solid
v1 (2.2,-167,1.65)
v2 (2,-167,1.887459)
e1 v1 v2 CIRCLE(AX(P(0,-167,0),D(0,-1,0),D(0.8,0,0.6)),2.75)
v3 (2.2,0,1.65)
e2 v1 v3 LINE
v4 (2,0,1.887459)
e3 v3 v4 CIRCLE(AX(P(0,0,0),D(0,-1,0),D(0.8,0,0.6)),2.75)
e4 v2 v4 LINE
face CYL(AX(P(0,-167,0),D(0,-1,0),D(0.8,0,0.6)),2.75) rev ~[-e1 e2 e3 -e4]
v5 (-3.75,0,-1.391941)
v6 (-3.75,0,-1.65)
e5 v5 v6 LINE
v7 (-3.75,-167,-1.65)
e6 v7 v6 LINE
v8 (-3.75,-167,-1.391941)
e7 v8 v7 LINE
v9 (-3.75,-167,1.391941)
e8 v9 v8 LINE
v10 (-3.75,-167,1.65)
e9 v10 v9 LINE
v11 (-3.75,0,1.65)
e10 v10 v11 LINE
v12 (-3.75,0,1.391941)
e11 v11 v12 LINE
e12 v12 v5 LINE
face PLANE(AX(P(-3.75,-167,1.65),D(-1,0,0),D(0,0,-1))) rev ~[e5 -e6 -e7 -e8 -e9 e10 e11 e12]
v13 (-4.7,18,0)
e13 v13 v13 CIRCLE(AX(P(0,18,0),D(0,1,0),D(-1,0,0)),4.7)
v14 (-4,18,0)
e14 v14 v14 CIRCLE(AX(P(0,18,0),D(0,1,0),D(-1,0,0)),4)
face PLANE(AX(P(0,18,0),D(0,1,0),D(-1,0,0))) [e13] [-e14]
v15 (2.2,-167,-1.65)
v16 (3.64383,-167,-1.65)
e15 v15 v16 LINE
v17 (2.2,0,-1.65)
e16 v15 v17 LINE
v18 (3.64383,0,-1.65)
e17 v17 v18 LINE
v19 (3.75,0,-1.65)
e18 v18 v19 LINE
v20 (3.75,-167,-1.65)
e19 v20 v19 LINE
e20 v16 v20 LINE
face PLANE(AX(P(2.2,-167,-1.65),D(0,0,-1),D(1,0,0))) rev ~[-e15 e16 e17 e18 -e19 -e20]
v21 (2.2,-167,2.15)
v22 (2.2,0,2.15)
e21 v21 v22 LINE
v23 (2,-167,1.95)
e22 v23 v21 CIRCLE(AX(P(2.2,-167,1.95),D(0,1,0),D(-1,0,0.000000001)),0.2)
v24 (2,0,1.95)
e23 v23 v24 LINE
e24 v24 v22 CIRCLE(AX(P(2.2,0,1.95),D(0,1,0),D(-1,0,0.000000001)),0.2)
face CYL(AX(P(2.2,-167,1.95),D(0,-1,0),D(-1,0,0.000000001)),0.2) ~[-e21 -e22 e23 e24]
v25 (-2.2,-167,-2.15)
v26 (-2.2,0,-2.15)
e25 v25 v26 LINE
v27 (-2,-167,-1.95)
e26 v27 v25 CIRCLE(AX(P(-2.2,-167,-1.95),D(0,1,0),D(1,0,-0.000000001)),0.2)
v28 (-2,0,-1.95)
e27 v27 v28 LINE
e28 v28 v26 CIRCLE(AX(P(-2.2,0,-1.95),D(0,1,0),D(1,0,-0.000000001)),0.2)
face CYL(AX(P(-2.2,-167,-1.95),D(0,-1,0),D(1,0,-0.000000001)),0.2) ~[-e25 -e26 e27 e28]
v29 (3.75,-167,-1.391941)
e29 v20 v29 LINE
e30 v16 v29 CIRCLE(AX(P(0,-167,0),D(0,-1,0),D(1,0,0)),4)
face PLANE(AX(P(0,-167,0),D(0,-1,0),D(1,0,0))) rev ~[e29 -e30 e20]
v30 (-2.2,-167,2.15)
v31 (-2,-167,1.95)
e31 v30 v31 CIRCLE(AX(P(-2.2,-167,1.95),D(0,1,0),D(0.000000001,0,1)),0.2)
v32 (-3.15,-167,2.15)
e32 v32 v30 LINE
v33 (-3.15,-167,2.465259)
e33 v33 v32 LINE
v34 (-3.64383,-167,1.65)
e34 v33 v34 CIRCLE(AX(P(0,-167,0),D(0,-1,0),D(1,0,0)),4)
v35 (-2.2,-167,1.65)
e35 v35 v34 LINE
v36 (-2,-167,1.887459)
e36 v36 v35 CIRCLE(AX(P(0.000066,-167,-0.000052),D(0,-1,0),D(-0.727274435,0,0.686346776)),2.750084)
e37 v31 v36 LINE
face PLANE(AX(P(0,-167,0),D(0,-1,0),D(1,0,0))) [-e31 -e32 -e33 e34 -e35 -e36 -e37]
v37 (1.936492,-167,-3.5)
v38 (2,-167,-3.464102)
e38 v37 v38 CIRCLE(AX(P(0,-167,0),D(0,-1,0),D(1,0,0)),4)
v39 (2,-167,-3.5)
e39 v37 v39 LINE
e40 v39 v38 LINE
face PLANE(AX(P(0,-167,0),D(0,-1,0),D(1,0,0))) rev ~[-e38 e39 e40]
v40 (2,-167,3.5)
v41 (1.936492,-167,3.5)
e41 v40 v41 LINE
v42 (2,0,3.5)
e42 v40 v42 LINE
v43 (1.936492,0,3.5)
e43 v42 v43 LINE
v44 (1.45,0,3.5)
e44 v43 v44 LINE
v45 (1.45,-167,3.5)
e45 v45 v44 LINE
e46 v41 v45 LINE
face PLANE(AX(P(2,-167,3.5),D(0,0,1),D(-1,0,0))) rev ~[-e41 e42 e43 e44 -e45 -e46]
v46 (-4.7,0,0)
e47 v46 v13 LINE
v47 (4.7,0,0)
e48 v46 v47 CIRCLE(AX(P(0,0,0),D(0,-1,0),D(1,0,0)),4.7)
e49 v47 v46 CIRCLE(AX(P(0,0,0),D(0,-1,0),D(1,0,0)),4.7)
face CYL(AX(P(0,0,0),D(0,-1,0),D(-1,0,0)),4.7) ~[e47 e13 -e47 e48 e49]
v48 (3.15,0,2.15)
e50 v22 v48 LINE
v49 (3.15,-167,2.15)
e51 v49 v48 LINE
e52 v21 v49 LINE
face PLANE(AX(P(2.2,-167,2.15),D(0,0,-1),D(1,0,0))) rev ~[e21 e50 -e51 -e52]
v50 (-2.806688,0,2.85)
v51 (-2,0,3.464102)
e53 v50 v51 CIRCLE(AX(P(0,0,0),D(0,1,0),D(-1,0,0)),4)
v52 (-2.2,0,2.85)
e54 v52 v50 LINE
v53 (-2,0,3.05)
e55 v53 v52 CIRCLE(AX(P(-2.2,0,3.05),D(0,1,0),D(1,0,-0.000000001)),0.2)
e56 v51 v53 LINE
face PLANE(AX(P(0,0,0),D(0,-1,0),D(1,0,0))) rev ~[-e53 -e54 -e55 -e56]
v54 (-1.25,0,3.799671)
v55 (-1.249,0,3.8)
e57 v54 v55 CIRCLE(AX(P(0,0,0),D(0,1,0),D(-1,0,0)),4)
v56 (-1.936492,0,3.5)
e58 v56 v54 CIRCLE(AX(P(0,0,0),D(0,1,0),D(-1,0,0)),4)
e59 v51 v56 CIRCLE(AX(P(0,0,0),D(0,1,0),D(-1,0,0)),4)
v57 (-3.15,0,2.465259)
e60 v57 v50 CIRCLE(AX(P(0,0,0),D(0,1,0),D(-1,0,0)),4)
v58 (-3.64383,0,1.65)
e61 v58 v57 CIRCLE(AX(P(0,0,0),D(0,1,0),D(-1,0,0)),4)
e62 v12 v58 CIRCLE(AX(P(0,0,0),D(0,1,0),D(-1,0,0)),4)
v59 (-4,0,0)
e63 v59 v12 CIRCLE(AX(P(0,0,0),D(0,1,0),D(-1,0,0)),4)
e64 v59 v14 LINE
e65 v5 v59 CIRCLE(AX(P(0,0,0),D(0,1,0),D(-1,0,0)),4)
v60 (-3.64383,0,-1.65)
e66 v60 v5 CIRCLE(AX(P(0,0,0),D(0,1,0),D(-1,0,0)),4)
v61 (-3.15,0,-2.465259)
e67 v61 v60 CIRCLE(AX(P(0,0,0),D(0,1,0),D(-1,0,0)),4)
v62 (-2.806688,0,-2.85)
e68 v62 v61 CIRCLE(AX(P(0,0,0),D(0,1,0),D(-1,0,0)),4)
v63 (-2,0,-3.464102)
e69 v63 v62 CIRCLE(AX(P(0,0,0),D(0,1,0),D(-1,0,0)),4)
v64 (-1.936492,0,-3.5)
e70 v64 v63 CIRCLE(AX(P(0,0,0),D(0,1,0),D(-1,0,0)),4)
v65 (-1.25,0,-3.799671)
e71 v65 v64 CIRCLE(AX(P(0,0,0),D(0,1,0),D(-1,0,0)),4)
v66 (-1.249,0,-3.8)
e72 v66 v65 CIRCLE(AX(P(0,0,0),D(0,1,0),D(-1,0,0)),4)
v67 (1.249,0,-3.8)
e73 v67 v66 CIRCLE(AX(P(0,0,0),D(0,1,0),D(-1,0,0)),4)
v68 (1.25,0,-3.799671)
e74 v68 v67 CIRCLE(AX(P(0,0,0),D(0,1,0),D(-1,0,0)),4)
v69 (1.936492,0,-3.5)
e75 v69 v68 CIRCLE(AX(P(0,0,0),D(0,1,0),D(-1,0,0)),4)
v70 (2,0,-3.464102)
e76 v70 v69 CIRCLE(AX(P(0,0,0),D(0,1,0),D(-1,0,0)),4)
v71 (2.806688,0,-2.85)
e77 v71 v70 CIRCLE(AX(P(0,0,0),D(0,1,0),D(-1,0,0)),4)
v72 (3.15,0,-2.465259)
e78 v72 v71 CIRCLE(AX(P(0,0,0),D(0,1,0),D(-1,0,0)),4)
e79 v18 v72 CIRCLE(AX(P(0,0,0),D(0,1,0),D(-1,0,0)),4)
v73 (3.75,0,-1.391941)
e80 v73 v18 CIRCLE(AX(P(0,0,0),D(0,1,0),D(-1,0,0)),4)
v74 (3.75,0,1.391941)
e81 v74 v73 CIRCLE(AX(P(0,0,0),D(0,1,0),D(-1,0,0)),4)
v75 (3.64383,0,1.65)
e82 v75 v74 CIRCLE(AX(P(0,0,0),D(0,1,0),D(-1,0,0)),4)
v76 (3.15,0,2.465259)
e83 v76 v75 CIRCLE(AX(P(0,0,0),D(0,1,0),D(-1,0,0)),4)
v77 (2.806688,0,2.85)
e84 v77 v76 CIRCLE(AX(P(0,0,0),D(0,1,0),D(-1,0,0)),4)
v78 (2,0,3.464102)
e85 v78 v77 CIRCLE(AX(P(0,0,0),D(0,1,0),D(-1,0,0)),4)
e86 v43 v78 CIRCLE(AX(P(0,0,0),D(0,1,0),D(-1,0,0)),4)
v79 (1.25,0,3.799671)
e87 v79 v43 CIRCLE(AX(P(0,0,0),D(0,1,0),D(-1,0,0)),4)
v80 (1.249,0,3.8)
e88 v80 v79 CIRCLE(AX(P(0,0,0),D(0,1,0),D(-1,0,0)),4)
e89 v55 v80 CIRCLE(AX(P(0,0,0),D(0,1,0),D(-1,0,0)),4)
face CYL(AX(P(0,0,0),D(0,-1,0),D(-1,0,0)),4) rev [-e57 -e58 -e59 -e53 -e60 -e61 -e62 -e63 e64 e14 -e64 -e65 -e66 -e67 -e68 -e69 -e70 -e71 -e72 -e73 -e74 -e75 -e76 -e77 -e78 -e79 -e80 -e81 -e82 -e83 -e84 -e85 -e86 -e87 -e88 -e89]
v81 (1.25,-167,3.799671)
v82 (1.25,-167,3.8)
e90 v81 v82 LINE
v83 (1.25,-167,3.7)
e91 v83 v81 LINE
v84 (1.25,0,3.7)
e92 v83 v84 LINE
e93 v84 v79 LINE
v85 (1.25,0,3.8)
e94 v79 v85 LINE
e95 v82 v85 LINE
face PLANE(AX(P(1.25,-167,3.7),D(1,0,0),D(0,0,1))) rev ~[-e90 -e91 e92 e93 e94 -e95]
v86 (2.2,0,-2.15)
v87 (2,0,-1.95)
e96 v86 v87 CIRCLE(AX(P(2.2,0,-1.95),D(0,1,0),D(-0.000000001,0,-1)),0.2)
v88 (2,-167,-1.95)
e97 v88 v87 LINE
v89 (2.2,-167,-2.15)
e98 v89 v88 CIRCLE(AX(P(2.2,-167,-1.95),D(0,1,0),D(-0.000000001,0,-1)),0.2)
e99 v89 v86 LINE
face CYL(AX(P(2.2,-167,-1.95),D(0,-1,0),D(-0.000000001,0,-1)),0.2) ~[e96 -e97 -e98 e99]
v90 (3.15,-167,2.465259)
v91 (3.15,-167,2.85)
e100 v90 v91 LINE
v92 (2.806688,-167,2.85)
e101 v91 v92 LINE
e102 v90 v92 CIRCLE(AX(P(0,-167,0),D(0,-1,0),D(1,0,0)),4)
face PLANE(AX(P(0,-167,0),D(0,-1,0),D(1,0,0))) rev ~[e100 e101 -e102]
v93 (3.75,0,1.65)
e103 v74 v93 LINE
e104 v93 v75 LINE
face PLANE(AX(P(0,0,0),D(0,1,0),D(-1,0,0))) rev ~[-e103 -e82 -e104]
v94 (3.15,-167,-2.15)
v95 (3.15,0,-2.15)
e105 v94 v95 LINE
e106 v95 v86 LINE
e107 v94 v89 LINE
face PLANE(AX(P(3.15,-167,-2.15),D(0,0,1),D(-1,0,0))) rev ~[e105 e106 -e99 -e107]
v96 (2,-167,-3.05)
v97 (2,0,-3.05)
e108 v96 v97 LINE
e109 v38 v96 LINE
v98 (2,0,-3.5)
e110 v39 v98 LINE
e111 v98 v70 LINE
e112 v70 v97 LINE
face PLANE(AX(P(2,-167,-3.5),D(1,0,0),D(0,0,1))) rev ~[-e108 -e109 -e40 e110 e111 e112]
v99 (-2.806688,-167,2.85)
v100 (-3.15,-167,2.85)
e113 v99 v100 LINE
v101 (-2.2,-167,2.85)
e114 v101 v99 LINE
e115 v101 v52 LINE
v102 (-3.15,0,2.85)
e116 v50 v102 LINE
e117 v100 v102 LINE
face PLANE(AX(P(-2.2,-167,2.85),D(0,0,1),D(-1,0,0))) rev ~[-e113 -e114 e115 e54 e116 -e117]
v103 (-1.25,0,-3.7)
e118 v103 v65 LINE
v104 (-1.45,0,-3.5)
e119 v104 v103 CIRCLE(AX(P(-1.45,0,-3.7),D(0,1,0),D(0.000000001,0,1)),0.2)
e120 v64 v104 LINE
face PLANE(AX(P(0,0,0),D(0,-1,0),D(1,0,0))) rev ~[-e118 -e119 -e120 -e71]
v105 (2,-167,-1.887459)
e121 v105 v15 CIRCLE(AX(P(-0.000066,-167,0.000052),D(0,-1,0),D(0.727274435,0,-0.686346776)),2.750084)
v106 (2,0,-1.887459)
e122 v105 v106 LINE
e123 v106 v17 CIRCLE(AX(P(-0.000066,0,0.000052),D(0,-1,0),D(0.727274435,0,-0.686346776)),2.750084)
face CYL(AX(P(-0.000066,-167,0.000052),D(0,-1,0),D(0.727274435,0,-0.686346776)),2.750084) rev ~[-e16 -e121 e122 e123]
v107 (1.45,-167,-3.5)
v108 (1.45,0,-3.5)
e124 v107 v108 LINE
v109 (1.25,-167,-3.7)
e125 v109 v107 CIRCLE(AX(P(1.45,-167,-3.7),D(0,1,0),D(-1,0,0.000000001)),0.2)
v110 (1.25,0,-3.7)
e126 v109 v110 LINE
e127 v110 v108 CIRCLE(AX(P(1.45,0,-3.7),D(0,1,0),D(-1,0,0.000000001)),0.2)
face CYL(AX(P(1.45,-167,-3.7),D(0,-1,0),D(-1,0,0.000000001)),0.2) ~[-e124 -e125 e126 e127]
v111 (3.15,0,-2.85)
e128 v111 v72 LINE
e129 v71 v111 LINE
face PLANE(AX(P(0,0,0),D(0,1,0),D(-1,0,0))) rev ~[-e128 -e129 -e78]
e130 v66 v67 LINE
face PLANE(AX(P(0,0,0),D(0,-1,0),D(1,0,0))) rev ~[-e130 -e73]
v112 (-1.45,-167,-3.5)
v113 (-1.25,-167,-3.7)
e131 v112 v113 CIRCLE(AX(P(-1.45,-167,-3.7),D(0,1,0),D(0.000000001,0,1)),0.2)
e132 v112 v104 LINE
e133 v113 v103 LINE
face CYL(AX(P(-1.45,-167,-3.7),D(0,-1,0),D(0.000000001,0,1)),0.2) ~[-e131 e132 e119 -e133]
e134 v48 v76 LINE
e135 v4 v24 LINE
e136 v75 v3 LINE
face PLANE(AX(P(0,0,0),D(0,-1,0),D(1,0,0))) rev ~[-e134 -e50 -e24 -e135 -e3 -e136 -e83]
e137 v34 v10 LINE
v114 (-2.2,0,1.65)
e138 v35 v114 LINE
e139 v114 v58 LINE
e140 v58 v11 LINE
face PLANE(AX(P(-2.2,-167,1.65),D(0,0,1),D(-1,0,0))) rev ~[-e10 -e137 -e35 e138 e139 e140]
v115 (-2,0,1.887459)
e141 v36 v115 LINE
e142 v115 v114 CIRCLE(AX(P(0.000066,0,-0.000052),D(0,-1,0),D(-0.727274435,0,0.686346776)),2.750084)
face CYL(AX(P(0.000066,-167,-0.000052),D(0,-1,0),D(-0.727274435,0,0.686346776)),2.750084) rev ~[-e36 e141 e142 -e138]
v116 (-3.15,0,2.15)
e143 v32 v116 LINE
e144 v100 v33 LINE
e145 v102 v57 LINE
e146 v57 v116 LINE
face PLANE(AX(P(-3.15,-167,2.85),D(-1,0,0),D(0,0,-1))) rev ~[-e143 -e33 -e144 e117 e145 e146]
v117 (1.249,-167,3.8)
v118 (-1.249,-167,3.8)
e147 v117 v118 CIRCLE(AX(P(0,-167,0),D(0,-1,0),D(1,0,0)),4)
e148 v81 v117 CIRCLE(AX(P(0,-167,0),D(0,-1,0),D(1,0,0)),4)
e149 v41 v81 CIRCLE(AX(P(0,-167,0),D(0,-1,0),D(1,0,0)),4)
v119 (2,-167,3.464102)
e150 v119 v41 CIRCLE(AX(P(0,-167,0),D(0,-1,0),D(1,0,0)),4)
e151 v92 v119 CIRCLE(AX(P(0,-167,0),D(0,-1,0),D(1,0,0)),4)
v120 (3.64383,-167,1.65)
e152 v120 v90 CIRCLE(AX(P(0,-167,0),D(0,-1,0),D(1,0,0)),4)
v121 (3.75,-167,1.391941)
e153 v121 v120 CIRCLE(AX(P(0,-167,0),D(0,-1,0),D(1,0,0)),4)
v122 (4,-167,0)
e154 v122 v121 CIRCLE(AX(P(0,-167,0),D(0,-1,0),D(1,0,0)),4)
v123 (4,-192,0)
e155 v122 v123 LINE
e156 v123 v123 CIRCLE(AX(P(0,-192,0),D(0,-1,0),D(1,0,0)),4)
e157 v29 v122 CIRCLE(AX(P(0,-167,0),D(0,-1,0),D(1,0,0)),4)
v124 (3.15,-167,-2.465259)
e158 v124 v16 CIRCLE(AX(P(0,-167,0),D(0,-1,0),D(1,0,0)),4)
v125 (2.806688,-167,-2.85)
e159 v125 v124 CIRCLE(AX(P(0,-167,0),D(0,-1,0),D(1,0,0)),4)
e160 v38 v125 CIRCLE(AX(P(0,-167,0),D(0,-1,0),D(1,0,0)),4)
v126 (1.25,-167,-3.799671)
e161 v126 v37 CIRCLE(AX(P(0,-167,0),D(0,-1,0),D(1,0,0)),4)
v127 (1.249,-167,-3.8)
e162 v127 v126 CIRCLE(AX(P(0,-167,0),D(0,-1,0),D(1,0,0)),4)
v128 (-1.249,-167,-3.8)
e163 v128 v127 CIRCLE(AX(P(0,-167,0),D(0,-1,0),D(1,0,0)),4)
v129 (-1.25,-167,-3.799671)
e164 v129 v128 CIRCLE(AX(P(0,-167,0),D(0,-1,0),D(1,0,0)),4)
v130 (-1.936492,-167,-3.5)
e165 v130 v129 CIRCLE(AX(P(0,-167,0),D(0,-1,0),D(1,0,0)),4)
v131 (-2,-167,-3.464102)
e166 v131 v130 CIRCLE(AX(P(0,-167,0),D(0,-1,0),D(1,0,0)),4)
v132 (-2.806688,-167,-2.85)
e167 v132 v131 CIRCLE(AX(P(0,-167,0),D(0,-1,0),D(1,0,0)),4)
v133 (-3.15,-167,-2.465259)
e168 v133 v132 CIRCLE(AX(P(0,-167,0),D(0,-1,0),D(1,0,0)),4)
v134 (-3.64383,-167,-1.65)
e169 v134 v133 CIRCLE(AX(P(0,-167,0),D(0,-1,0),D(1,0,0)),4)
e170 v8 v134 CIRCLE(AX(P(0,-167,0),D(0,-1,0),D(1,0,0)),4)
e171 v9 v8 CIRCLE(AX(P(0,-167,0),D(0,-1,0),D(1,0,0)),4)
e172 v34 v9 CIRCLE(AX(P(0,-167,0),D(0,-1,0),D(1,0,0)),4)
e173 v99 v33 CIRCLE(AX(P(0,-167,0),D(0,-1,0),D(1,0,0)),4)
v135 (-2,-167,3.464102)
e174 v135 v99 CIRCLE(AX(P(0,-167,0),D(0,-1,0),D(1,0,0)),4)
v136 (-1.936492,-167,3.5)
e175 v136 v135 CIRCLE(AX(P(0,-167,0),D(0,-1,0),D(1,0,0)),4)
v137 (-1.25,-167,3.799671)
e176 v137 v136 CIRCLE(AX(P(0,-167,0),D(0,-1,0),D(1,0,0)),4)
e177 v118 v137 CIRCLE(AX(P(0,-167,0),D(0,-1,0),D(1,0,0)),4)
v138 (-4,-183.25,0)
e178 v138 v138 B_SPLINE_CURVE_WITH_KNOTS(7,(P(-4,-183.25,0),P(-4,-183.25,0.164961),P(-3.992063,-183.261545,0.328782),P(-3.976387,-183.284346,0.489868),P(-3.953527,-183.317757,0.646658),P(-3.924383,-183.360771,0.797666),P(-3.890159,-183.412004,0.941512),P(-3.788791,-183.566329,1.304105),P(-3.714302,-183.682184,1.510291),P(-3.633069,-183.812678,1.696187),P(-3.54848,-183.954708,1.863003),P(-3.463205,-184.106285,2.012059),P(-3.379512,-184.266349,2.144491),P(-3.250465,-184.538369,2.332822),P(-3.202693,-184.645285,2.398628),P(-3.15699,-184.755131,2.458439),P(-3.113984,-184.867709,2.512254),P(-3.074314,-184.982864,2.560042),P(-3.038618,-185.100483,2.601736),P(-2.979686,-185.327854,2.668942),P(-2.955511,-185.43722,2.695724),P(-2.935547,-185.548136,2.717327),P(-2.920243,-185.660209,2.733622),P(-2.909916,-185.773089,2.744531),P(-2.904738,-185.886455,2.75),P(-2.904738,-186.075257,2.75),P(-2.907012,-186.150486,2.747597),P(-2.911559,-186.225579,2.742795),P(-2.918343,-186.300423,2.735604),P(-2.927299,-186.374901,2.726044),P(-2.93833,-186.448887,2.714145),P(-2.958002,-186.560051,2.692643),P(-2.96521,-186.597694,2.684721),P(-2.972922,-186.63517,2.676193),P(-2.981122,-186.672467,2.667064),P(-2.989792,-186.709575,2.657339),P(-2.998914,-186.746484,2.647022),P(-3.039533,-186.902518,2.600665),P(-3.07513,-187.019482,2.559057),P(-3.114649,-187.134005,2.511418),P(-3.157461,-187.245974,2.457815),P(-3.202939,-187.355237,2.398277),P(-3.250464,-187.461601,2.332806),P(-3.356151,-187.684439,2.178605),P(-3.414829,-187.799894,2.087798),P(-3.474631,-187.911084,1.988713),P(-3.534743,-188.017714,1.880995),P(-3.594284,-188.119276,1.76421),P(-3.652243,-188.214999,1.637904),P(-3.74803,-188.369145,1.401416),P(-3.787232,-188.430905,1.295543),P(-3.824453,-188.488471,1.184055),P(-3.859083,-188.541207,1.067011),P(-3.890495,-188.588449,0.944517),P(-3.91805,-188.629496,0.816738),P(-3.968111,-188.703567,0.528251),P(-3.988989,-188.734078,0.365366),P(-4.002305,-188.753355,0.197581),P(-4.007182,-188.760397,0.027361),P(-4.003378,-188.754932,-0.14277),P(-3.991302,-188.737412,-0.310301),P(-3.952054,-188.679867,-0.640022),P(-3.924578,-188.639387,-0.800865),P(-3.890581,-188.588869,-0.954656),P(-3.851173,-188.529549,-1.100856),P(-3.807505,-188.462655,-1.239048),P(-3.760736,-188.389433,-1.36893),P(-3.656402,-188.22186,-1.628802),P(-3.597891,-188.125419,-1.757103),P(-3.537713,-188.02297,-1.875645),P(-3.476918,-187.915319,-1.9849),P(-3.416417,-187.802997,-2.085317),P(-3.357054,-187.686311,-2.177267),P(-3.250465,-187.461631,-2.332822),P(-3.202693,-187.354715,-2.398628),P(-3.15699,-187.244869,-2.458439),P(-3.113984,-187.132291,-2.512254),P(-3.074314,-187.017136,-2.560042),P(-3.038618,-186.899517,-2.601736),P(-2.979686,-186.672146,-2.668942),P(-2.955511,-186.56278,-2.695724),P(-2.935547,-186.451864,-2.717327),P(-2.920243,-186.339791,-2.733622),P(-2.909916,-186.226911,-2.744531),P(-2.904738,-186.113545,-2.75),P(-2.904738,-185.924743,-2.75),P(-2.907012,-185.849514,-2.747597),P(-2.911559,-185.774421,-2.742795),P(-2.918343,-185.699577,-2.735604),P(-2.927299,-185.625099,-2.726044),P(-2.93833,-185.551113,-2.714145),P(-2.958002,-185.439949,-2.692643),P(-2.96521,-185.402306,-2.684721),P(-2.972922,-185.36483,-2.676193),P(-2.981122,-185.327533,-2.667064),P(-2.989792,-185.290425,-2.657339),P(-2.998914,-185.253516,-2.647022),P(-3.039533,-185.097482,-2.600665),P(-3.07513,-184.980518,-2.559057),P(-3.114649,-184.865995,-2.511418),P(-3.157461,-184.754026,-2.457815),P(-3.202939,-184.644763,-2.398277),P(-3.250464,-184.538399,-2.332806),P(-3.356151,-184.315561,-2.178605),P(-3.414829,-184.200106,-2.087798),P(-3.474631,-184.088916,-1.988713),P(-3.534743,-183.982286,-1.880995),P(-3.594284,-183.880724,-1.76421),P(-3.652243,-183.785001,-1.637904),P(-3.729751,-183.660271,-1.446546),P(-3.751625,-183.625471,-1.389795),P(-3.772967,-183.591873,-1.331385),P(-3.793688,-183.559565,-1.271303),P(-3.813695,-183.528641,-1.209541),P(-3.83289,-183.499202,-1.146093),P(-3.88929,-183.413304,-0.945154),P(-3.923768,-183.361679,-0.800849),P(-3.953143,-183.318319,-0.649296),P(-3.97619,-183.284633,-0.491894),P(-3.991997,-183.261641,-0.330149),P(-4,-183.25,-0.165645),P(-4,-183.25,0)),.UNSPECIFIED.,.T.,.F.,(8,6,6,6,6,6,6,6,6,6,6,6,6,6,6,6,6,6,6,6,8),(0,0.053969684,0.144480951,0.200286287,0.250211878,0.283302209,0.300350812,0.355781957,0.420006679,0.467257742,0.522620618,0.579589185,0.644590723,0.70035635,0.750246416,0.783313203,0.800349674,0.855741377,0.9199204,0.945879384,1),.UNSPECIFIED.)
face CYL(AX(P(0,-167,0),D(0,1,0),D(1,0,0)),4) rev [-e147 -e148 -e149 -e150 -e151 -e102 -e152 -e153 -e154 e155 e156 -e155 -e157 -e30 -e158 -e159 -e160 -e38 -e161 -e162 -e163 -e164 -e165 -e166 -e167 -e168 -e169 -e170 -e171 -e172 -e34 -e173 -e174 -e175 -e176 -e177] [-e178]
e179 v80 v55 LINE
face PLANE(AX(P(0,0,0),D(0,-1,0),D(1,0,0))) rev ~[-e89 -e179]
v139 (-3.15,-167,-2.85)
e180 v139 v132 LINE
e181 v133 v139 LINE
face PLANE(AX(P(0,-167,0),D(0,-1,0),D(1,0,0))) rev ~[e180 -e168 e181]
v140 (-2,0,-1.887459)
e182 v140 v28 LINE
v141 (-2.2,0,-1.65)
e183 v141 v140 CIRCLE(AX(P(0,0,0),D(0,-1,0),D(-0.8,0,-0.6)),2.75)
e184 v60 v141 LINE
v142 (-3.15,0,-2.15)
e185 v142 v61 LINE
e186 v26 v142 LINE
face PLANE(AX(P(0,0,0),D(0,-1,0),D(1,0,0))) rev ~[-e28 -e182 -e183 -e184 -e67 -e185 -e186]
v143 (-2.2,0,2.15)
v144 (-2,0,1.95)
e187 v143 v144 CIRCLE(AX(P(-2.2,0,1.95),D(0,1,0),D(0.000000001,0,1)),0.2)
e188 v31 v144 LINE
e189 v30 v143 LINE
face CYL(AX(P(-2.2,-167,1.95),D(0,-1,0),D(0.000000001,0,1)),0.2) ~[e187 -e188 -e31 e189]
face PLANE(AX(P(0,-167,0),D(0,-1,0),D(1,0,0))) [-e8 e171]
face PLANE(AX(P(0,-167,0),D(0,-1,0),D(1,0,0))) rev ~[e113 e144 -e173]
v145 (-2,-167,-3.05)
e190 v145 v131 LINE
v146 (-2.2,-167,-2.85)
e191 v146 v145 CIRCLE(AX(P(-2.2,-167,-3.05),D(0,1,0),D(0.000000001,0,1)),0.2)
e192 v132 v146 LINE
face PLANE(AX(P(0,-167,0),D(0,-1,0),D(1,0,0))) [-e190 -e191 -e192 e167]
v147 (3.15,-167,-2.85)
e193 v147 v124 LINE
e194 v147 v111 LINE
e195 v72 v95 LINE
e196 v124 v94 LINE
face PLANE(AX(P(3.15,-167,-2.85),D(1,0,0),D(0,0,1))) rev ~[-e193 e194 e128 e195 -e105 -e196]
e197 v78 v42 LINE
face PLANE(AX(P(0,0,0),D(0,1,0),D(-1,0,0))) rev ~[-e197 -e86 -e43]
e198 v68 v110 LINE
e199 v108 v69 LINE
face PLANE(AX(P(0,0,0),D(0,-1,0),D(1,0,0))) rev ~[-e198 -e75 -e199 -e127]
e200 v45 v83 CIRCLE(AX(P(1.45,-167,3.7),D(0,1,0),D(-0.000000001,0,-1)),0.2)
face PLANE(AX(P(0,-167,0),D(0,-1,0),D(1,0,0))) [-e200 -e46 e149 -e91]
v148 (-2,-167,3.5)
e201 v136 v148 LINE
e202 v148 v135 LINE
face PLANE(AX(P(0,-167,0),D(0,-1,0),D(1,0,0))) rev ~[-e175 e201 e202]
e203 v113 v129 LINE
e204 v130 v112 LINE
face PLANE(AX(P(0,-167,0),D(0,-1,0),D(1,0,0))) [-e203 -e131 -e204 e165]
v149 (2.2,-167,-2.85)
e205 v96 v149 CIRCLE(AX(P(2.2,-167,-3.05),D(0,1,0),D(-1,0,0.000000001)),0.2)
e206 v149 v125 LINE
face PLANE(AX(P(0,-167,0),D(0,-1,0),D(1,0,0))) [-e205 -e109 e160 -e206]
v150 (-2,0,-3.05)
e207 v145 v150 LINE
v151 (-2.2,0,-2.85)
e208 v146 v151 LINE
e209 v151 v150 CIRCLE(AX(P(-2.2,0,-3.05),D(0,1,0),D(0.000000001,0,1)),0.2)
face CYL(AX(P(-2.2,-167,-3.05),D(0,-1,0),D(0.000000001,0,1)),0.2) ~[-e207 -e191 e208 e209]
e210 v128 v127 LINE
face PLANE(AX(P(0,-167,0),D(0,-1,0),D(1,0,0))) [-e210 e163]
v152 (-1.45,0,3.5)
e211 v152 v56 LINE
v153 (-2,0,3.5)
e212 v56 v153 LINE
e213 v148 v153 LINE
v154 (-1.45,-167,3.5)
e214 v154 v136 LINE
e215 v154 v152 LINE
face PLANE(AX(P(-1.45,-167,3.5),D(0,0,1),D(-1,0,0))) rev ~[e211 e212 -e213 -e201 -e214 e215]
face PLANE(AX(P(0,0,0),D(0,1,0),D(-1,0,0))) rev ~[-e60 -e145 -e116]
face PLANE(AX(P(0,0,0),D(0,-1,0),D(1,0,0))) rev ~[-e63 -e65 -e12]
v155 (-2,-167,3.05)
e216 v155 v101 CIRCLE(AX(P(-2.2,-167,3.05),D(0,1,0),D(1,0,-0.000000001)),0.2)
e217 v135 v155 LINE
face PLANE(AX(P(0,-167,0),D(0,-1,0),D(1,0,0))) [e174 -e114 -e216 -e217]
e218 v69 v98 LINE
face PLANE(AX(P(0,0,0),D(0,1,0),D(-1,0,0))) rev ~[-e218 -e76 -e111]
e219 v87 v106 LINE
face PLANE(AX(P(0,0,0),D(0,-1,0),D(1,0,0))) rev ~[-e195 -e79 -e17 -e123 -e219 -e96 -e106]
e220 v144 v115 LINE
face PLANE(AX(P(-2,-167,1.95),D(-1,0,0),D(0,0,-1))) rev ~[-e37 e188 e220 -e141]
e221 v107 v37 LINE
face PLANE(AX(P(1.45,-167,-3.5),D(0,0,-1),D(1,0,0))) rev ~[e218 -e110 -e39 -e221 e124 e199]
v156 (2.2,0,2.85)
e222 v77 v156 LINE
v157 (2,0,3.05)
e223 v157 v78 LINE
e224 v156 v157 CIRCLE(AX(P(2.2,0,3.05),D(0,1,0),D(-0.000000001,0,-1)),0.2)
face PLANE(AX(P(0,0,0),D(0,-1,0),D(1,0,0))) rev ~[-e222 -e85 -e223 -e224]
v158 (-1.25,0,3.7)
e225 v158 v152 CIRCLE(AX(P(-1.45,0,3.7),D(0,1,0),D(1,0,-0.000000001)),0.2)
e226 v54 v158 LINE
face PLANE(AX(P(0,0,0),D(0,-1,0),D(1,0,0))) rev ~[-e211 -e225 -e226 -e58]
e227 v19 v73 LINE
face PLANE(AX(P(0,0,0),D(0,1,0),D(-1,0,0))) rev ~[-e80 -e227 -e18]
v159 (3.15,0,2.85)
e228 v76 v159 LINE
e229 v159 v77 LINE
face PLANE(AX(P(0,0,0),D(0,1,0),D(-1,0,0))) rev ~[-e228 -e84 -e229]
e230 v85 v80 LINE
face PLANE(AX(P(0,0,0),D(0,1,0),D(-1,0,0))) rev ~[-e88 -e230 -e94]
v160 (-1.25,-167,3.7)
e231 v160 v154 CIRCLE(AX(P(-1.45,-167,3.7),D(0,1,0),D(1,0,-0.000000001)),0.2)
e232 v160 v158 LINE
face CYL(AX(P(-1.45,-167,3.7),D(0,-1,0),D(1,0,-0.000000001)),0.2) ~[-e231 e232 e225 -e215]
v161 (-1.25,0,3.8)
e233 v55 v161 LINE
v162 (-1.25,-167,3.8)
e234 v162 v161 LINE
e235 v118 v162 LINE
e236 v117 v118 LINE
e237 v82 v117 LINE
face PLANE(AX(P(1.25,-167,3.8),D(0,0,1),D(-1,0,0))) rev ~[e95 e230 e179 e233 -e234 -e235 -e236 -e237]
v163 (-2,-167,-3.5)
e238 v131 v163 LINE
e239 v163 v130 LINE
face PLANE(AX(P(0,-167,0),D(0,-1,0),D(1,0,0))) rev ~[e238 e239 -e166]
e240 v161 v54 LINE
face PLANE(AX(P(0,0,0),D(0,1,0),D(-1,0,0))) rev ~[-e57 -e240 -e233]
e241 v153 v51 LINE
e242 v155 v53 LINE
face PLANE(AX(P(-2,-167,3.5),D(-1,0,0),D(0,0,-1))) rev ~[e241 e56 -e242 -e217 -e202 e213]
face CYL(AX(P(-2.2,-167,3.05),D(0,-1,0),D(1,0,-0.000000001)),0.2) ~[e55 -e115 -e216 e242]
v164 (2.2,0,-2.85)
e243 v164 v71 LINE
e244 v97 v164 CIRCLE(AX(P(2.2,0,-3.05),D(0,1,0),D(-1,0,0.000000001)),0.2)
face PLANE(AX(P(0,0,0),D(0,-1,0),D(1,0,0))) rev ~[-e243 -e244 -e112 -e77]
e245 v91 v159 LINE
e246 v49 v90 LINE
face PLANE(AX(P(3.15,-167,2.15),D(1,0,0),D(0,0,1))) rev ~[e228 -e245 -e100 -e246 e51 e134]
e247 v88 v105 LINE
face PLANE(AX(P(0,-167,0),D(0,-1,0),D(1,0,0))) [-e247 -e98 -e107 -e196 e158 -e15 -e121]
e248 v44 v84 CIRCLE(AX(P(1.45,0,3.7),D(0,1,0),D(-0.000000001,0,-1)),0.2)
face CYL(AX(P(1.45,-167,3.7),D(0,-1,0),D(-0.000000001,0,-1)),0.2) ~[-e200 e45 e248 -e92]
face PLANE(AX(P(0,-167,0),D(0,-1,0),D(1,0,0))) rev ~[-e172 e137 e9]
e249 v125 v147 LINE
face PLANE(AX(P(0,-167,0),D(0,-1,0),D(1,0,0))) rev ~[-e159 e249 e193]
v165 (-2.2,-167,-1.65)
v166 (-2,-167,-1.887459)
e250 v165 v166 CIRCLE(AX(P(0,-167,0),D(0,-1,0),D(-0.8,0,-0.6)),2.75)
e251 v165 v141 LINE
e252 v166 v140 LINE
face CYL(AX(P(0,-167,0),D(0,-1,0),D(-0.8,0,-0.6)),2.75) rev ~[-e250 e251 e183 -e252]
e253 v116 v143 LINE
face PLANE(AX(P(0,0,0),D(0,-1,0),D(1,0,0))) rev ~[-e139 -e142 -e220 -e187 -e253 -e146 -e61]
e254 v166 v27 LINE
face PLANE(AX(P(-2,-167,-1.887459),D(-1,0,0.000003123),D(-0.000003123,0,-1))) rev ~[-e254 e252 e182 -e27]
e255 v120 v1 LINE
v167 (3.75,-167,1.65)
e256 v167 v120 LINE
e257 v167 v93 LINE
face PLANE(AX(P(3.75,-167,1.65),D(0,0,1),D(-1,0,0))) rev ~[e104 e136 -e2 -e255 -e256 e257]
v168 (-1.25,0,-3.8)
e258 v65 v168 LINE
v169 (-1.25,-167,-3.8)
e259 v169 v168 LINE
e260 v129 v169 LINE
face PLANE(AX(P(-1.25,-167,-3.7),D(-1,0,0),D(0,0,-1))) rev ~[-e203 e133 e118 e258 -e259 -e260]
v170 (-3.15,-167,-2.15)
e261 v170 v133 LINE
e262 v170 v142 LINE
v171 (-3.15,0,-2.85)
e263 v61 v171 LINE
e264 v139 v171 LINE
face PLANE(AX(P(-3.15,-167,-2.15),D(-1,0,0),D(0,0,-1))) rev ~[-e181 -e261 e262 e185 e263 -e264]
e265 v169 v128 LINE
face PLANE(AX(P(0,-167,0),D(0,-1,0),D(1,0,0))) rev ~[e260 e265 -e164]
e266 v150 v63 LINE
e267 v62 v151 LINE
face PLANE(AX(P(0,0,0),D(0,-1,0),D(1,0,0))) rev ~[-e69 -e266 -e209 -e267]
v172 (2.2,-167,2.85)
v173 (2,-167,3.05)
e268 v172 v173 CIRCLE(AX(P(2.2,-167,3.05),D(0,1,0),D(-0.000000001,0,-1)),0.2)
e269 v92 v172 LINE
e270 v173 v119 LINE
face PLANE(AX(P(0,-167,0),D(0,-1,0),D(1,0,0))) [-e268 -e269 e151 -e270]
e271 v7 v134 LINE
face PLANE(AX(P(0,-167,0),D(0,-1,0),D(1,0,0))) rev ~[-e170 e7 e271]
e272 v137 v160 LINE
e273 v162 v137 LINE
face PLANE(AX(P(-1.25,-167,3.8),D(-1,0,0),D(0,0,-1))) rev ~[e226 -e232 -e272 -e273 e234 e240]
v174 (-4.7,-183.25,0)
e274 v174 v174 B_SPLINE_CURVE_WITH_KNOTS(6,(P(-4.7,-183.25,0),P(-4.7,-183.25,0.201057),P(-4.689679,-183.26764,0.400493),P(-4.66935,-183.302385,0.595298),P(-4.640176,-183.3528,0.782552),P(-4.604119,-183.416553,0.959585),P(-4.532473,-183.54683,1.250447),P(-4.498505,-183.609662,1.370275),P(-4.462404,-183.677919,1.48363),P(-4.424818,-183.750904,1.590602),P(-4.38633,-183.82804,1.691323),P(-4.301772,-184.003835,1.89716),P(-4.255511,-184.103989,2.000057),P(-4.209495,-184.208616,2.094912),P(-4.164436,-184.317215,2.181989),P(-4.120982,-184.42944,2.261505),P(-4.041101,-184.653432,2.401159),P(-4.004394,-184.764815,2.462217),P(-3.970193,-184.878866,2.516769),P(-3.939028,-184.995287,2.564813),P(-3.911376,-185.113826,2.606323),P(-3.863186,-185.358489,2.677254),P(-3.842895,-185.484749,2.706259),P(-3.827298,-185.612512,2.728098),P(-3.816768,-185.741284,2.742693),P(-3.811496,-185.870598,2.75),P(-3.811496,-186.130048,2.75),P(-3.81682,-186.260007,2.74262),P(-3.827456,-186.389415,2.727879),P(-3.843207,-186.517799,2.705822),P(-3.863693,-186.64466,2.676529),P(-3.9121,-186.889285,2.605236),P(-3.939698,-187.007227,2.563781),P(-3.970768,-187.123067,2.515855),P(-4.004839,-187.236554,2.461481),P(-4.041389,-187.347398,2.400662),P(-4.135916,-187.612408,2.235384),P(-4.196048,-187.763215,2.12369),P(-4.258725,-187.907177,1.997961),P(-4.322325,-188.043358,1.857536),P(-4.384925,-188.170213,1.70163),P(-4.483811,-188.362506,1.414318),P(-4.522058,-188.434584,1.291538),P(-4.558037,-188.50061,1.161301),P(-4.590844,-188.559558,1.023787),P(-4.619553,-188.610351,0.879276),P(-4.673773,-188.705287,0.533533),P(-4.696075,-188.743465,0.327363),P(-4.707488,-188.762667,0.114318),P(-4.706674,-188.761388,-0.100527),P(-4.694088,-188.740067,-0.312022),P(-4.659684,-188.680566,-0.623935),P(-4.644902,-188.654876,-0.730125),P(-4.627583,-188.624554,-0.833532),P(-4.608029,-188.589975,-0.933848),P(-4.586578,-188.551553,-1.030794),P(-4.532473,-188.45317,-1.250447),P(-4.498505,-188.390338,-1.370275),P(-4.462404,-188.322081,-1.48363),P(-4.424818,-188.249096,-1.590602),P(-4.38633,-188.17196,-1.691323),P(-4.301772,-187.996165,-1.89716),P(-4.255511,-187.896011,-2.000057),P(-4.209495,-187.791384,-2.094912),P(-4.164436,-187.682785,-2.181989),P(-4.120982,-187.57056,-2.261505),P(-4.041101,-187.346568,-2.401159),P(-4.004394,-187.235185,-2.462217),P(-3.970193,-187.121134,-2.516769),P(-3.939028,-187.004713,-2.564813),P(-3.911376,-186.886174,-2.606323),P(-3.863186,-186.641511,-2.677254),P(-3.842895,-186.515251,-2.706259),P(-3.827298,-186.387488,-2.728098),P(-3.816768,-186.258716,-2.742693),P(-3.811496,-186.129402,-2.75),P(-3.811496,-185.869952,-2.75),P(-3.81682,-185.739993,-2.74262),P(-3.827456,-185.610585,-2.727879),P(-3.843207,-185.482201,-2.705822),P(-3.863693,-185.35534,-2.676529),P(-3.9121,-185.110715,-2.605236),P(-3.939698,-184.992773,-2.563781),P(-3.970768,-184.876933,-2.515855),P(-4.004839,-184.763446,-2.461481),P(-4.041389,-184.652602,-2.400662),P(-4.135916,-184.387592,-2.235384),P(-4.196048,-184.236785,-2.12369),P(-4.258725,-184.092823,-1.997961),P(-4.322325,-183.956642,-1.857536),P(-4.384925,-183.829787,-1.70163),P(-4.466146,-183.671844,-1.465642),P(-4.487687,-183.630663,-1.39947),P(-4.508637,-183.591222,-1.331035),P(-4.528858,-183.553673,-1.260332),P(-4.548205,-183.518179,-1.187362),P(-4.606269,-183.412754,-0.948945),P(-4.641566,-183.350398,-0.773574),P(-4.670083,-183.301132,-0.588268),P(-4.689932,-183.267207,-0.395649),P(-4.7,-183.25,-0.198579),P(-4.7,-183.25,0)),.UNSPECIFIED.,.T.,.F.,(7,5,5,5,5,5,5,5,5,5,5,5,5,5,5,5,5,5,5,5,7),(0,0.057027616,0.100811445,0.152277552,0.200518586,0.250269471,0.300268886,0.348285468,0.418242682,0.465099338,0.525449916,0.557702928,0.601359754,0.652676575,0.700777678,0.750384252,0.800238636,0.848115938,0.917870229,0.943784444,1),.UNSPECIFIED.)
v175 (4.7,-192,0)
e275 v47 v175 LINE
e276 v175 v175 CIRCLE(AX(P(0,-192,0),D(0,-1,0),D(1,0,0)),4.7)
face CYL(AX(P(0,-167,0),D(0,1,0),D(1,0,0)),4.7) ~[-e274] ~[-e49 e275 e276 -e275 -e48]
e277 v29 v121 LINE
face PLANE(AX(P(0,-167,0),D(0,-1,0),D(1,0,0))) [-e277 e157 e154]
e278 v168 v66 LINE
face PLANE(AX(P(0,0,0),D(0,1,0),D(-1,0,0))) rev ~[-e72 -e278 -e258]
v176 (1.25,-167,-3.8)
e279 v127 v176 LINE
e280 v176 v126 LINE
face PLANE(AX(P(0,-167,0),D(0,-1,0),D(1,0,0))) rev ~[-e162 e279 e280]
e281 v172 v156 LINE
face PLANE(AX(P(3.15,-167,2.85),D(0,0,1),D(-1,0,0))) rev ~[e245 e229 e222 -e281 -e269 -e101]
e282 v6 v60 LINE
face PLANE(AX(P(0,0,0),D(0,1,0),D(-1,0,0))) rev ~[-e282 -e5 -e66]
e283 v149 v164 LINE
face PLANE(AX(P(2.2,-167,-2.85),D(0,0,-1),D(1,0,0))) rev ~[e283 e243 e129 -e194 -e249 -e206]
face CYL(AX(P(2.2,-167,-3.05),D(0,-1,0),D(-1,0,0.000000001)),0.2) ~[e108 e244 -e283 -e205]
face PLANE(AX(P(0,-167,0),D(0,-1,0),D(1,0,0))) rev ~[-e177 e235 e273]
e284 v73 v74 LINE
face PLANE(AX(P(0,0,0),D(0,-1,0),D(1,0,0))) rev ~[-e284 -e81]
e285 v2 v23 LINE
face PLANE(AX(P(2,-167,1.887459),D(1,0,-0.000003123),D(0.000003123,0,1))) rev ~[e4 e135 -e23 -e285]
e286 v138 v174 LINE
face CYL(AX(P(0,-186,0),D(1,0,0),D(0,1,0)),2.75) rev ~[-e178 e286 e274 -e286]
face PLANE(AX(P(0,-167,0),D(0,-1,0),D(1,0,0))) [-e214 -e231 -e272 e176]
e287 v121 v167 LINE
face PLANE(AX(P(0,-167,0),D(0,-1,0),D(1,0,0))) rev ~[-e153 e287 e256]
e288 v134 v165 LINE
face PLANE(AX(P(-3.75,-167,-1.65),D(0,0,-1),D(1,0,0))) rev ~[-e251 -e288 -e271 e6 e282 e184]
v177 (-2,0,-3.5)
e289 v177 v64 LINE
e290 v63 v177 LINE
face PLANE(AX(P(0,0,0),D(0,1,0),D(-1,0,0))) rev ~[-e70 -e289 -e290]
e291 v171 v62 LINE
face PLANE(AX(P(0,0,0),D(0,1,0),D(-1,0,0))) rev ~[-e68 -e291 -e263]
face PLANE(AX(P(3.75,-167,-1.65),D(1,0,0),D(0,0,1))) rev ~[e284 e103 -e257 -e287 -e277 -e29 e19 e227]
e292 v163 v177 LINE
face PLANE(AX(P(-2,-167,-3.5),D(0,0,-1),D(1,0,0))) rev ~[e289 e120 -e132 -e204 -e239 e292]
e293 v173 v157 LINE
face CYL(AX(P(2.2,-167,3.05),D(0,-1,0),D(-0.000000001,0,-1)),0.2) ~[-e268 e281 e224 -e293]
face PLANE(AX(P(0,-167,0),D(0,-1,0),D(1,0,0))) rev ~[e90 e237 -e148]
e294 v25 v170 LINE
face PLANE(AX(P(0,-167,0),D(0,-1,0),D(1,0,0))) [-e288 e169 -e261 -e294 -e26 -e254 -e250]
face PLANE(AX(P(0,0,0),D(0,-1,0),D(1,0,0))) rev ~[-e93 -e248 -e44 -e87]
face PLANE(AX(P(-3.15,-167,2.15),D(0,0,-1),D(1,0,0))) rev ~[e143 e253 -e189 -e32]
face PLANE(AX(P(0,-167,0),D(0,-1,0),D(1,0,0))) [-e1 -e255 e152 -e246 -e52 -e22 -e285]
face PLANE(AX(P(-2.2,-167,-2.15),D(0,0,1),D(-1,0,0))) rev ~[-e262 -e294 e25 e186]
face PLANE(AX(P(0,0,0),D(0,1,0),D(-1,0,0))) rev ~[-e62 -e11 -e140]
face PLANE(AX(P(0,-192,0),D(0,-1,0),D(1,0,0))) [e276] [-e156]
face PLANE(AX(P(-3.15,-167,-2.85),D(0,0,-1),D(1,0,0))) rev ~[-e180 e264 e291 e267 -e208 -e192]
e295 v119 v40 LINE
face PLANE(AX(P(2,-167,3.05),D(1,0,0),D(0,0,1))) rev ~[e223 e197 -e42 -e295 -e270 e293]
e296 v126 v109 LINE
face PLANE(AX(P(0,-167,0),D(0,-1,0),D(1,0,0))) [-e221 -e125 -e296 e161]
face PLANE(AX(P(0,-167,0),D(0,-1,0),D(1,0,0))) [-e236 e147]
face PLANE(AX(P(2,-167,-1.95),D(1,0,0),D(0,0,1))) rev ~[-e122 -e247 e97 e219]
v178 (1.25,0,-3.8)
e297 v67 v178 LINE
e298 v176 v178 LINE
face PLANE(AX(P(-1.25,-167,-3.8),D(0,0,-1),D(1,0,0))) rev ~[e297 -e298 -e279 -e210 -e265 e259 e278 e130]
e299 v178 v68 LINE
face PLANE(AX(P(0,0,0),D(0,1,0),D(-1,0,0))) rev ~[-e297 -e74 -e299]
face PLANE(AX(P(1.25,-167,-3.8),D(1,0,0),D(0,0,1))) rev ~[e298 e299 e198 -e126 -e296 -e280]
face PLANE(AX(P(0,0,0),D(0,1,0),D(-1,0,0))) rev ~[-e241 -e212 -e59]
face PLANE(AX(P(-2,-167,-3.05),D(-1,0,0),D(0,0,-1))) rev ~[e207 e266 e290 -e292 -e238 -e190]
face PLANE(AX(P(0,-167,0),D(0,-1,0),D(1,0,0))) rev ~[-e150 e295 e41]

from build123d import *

# Parameters (mm, degrees)
F3_R      = 4.7
F4_DEPTH  = 167
F8_DEPTH  = 167
F6_R      = 4.7
F6_R_2    = 4
F9_DEPTH  = 25
F7_R      = 4.7
F7_R_2    = 4
F10_DEPTH = 18
F11_R     = 2.75
F12_DEPTH = 4.701


# Not quite as in the source:
# - ends of sketch curves that miss each other by under 0.0002 mm in the source are joined


with BuildPart() as f4:
    # F3 (on Front) → F4 (new body)
    with BuildSketch(Plane.XZ):
        Circle(F3_R)
    extrude(amount=F4_DEPTH)

    # F5 (on face) → F8 (cut, through all)
    with BuildSketch(Plane.XZ.offset(167)):
        with BuildLine():
            Line((-1.25, -3.8), (0, -3.8))
            Line((0, -3.8), (1.25, -3.8))
            Line((1.25, -3.8), (1.25, -3.7))
            ThreePointArc((1.25, -3.7), (1.3085786438, -3.5585786438), (1.45, -3.5))
            Line((1.45, -3.5), (2, -3.5))
            Line((2, -3.5), (2, -3.05))
            ThreePointArc((2, -3.05), (2.0585786438, -2.9085786438), (2.2, -2.85))
            Line((2.2, -2.85), (3.15, -2.85))
            Line((3.15, -2.85), (3.15, -2.15))
            Line((3.15, -2.15), (2.2, -2.15))
            ThreePointArc((2.2, -2.15), (2.0585786438, -2.0914213562), (2, -1.95))
            Line((2, -1.95), (2, -1.887459))
            ThreePointArc((2, -1.887459), (2.1033535752, -1.771554046), (2.2, -1.65))
            Line((2.2, -1.65), (3.75, -1.65))
            Line((3.75, -1.65), (3.75, 0))
            Line((3.75, 0), (3.75, 1.65))
            Line((3.75, 1.65), (2.2, 1.65))
            ThreePointArc((2.2, 1.65), (2.1033535752, 1.771554046), (1.9999998047, 1.8874588157))
            Line((1.9999998047, 1.8874588157), (2, 1.95))
            ThreePointArc((2, 1.95), (2.0585786438, 2.0914213562), (2.2, 2.15))
            Line((2.2, 2.15), (3.15, 2.15))
            Line((3.15, 2.15), (3.15, 2.85))
            Line((3.15, 2.85), (2.2, 2.85))
            ThreePointArc((2.2, 2.85), (2.0585786438, 2.9085786438), (2, 3.05))
            Line((2, 3.05), (2, 3.5))
            Line((2, 3.5), (1.45, 3.5))
            ThreePointArc((1.45, 3.5), (1.3085786438, 3.5585786438), (1.25, 3.7))
            Line((1.25, 3.7), (1.25, 3.8))
            Line((1.25, 3.8), (0, 3.8))
            Line((0, 3.8), (-1.25, 3.8))
            Line((-1.25, 3.8), (-1.25, 3.7))
            ThreePointArc((-1.25, 3.7), (-1.3085786438, 3.5585786438), (-1.45, 3.5))
            Line((-1.45, 3.5), (-2, 3.5))
            Line((-2, 3.5), (-2, 3.05))
            ThreePointArc((-2, 3.05), (-2.0585786438, 2.9085786438), (-2.2, 2.85))
            Line((-2.2, 2.85), (-3.15, 2.85))
            Line((-3.15, 2.85), (-3.15, 2.15))
            Line((-3.15, 2.15), (-2.2, 2.15))
            ThreePointArc((-2.2, 2.15), (-2.0585786438, 2.0914213562), (-2, 1.95))
            Line((-2, 1.95), (-2, 1.887459))
            ThreePointArc((-2, 1.887459), (-2.1033535752, 1.771554046), (-2.2, 1.65))
            Line((-2.2, 1.65), (-3.75, 1.65))
            Line((-3.75, 1.65), (-3.75, 0))
            Line((-3.75, 0), (-3.75, -1.65))
            Line((-3.75, -1.65), (-2.2, -1.65))
            ThreePointArc((-2.2, -1.65), (-2.1033535752, -1.771554046), (-1.9999998047, -1.8874588157))
            Line((-1.9999998047, -1.8874588157), (-2, -1.95))
            ThreePointArc((-2, -1.95), (-2.0585786438, -2.0914213562), (-2.2, -2.15))
            Line((-2.2, -2.15), (-3.15, -2.15))
            Line((-3.15, -2.15), (-3.15, -2.85))
            Line((-3.15, -2.85), (-2.2, -2.85))
            ThreePointArc((-2.2, -2.85), (-2.0585786438, -2.9085786438), (-2, -3.05))
            Line((-2, -3.05), (-2, -3.5))
            Line((-2, -3.5), (-1.45, -3.5))
            ThreePointArc((-1.45, -3.5), (-1.3085786438, -3.5585786438), (-1.25, -3.7))
            Line((-1.25, -3.7), (-1.25, -3.8))
        make_face()
    extrude(amount=-F8_DEPTH, mode=Mode.SUBTRACT)

    # F6 (on face) → F9 (join)
    with BuildSketch(Plane.XZ.offset(167)):
        Circle(F6_R)
        Circle(F6_R_2, mode=Mode.SUBTRACT)
    extrude(amount=F9_DEPTH)

    # F7 (on face) → F10 (join)
    with BuildSketch(Plane(origin=(0, 0, 0), x_dir=(-1, 0, 0), z_dir=(0, 1, 0))):
        Circle(F7_R)
        Circle(F7_R_2, mode=Mode.SUBTRACT)
    extrude(amount=F10_DEPTH)

    # F11 (on Right) → F12 (cut, through all)
    with BuildSketch(Plane.YZ):
        with Locations((-186, 0)):
            Circle(F11_R)
    extrude(amount=-F12_DEPTH, mode=Mode.SUBTRACT)


solid = f4.part
